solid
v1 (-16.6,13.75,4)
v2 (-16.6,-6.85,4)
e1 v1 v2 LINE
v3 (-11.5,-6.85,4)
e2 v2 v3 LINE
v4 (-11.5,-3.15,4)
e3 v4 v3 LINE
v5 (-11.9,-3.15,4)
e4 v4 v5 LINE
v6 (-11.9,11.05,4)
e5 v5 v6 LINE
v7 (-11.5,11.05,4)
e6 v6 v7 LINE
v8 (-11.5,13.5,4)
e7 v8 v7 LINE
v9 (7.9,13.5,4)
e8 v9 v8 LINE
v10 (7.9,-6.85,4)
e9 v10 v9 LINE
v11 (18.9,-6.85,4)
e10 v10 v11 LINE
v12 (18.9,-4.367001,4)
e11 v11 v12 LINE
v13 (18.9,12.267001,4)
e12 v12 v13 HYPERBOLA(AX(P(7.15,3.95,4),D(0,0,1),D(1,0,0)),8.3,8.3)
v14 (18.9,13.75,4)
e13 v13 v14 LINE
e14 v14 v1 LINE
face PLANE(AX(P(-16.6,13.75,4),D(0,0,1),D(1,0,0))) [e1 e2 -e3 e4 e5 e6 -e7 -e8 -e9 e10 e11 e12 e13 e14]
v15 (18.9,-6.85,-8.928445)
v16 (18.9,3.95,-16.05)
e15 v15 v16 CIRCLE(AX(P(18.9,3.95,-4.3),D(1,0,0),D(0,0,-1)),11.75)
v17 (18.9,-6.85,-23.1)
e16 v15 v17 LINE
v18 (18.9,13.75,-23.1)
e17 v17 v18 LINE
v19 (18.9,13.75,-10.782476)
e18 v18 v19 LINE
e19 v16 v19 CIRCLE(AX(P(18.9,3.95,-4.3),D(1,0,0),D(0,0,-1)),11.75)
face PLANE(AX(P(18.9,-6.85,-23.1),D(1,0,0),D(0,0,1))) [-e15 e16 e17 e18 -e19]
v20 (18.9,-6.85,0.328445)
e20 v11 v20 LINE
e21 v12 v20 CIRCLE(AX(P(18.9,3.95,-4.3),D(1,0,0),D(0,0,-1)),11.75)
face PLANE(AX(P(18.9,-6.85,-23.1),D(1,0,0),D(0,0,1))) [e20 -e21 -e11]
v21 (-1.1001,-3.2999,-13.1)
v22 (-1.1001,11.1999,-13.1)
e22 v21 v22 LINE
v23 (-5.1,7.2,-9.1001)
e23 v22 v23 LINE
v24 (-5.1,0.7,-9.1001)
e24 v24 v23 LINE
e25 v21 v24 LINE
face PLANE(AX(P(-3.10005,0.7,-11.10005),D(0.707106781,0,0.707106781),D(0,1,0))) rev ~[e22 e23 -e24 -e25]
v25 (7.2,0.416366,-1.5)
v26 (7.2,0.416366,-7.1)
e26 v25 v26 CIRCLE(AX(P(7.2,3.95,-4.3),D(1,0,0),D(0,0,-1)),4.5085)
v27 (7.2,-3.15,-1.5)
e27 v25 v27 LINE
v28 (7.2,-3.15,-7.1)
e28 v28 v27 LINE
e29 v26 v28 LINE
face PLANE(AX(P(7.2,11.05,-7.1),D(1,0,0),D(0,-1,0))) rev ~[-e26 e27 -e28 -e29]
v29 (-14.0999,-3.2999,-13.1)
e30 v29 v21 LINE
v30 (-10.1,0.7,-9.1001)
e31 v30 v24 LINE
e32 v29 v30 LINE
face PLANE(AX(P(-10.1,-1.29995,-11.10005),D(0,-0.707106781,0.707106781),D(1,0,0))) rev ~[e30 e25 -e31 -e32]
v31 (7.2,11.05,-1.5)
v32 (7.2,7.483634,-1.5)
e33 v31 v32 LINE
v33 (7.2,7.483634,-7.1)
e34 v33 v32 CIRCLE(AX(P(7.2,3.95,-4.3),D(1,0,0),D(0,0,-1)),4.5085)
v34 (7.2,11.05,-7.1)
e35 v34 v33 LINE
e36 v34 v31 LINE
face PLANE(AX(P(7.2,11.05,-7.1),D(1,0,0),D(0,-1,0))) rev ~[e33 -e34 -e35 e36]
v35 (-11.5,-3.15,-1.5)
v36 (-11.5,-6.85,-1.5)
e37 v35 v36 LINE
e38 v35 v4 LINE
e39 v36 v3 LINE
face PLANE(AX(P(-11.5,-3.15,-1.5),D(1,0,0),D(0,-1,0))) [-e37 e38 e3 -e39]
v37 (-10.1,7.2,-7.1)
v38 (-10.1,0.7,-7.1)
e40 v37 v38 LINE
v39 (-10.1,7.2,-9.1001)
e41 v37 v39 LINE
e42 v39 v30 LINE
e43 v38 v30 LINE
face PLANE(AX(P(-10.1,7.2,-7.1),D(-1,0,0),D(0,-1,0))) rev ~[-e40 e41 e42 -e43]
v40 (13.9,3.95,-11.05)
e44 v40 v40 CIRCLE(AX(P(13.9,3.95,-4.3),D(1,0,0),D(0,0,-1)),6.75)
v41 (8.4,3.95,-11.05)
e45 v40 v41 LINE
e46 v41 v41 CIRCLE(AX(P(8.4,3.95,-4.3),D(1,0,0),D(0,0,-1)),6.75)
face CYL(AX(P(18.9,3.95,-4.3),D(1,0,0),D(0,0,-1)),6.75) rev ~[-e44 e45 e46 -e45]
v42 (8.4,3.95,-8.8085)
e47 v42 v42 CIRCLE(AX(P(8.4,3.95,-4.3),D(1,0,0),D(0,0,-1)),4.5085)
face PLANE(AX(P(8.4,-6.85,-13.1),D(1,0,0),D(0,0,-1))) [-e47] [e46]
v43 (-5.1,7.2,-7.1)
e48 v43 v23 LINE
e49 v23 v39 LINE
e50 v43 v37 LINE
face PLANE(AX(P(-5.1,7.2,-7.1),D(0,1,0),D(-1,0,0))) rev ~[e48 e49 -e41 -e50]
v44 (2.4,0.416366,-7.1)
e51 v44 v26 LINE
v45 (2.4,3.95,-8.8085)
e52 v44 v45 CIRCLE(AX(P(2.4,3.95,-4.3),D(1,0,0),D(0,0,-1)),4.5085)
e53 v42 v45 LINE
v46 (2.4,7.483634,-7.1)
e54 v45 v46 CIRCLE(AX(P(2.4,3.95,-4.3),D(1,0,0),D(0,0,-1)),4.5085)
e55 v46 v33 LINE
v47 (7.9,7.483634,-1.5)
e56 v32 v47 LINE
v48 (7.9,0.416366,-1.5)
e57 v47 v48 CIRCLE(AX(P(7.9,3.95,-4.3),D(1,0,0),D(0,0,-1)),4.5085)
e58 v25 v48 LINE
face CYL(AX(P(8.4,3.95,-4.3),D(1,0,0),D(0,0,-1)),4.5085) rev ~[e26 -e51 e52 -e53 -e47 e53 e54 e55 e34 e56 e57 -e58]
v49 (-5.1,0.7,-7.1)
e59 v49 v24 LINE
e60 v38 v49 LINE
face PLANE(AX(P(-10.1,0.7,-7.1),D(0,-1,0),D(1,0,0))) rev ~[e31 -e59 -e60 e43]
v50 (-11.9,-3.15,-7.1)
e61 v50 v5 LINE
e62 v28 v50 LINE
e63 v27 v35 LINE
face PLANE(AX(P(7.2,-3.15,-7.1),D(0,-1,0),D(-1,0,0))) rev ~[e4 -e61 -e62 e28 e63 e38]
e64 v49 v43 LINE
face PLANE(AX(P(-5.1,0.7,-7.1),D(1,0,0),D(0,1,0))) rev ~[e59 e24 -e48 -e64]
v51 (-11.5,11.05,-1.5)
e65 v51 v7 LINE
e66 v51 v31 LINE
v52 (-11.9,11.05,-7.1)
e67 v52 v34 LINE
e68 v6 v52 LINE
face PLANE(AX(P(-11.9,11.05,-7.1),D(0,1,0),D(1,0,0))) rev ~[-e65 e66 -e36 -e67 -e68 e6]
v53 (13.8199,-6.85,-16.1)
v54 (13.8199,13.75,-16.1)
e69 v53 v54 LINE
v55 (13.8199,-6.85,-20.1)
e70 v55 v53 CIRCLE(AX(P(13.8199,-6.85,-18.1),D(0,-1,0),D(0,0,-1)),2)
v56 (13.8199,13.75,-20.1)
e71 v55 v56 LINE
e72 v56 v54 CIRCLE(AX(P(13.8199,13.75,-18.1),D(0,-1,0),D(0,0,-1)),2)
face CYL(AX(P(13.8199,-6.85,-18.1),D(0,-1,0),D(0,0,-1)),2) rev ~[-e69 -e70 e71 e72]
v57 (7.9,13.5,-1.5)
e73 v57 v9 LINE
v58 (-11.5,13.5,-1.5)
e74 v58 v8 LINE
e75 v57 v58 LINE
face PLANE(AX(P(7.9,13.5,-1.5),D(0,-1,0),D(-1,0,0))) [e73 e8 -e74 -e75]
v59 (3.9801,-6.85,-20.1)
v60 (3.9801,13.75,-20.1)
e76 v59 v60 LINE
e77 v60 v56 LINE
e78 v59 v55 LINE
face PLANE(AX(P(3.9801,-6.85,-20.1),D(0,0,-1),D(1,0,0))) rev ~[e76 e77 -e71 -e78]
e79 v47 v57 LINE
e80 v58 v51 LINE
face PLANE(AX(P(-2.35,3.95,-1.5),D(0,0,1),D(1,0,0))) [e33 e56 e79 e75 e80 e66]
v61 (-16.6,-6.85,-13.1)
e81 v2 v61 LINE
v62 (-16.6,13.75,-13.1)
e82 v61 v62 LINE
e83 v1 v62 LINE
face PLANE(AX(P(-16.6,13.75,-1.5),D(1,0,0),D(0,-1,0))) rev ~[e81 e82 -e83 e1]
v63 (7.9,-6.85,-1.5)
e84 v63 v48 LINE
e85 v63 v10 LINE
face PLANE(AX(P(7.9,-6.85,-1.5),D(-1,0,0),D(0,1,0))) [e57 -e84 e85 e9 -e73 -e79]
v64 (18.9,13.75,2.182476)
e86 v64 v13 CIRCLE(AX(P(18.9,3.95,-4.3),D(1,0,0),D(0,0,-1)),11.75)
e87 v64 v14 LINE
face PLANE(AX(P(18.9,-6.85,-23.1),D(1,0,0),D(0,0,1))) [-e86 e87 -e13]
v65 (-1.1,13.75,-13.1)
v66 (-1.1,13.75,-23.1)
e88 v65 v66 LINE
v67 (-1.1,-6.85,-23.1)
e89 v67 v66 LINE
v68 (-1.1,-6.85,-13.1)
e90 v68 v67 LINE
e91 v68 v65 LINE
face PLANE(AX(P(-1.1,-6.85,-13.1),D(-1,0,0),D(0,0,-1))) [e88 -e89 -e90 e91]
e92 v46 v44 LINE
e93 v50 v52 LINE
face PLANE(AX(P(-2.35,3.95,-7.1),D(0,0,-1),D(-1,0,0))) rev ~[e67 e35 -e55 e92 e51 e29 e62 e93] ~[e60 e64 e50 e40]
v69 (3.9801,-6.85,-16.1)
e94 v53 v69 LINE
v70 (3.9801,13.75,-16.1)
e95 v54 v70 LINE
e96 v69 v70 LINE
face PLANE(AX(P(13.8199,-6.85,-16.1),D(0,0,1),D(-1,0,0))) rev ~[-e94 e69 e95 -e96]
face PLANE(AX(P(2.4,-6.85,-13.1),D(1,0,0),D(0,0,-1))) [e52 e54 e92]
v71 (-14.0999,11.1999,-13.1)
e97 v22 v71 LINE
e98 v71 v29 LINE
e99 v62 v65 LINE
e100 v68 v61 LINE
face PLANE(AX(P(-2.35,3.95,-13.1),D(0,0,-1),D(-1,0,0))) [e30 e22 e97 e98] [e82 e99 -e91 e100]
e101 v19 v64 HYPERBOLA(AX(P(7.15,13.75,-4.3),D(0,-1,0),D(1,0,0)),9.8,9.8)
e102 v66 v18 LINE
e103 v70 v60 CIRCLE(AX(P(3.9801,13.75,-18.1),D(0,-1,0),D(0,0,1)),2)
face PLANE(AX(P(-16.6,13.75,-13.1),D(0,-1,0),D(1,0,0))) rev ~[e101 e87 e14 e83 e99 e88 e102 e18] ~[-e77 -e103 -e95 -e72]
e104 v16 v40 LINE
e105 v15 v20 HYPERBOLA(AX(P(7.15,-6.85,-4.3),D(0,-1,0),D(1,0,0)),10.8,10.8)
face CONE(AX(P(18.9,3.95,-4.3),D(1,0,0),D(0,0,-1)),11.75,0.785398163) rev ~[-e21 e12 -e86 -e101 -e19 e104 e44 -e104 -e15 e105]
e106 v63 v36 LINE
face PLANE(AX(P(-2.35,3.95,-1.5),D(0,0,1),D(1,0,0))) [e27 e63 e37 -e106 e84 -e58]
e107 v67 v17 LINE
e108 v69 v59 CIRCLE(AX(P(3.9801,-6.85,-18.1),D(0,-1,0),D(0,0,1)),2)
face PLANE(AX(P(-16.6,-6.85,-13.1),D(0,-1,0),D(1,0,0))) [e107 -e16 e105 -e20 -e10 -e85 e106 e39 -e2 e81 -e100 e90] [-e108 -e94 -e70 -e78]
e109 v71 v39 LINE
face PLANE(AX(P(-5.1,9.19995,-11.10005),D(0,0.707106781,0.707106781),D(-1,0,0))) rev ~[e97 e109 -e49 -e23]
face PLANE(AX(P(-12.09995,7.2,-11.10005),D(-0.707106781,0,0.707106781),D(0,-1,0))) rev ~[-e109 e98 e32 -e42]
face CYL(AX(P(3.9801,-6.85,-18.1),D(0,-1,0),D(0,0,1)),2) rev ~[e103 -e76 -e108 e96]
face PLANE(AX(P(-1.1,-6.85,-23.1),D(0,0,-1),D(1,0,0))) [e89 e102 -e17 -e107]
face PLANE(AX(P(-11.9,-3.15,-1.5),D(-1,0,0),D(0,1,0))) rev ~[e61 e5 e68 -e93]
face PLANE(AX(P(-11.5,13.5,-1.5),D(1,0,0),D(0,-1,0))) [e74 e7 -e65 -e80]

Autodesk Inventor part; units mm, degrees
ref_plane "YZ Plane" through (0, 0, 0) normal (1, 0, 0) x (0, 1, 0)
ref_plane "XZ Plane" through (0, 0, 0) normal (0, 1, 0) x (-1, 0, 0)
ref_plane "Arbeitsebene1" through (0, 0, 0) normal (0, 0, 1) x (1, 0, 0)
ref_plane "Arbeitsebene2" through (-2.35, 3.95, -7.1) normal (0, 0, -1) x (-1, 0, 0)
sketch "Skizze1" plane through (-2.35, 3.95, -7.1) normal (0, 0, -1) x (-1, 0, 0)
  line L0 (7.75, 3.25) -> (7.75, -3.25) projected
  line L1 (7.75, -3.25) -> (2.75, -3.25) projected
  line L2 (2.75, -3.25) -> (2.75, 3.25) projected
  line L3 (2.75, 3.25) -> (7.75, 3.25) projected
  line L4 (9.25, -6.8) -> (9.25, 6.8) projected
  line L5 (9.25, 6.8) -> (-9.25, 6.8) projected
  line L6 (-9.25, 6.8) -> (-9.25, -6.8) projected
  line L7 (-9.25, -6.8) -> (9.25, -6.8) projected
  line L8 (14.25, 9.8) -> (-21.25, 9.8)
  line L9 (-21.25, 9.8) -> (-21.25, -10.8)
  line L10 (-21.25, -10.8) -> (14.25, -10.8)
  line L11 (14.25, -10.8) -> (14.25, 9.8)
  point P0 (-2.35, -3.95)
  dimension "d0" = 5
  dimension "d1" = 3
  dimension "d2" = 4
  dimension "d3" = 12
extrude "Extrusion1" add sketch "Skizze1" along normal blind 6 contours L7 L6 L5 L4 | L11 L10 L9 L8
sketch "Skizze2" plane through (-2.35, 3.95, -7.1) normal (0, 0, 1) x (1, 0, 0)
  line L0 (-9.25, -6.8) -> (-9.25, 6.8) projected
  line L1 (9.25, -6.8) -> (-9.25, -6.8) projected
  line L2 (9.25, 6.8) -> (9.25, -6.8) projected
  line L3 (-9.25, 6.8) -> (9.25, 6.8) projected
  line L4 (9.55, 7.1) -> (9.55, -7.1)
  line L5 (9.55, -7.1) -> (-9.55, -7.1)
  line L6 (-9.55, -7.1) -> (-9.55, 7.1)
  line L7 (-9.55, 7.1) -> (9.55, 7.1)
  line L8 (21.25, 9.8) -> (21.25, -10.8) projected
  line L9 (-14.25, 9.8) -> (21.25, 9.8) projected
  line L10 (-14.25, -10.8) -> (-14.25, 9.8) projected
  line L11 (21.25, -10.8) -> (-14.25, -10.8) projected
  line L12 (-7.75, 3.25) -> (-7.75, -3.25) projected
  line L13 (-2.75, 3.25) -> (-7.75, 3.25) projected
  line L14 (-2.75, -3.25) -> (-2.75, 3.25) projected
  line L15 (-7.75, -3.25) -> (-2.75, -3.25) projected
  point P0 (2.35, -3.95)
  dimension "d6" = 0.3
ref_plane "Arbeitsebene3" through (-10.5, -12.5, -1.5) normal (0, 0, -1) x (0, 1, 0)
extrude "Extrusion2" add sketch "Skizze2" along normal up to surface (5.6 mm away) contours L8 L11 L10 L9
sketch "Skizze3" plane through (-16.6, 13.75, -1.5) normal (0, 0, 1) x (1, 0, 0)
  line L0 (23.5, -26.25) -> (23.5, -1.25) projected
  line L1 (23.5, -1.25) -> (6.1, -1.25) projected
  line L2 (6.1, -1.25) -> (6.1, -26.25) projected
  line L3 (6.1, -26.25) -> (23.5, -26.25) projected
  line L4 (24.5, -27.25) -> (24.5, -0.25)
  line L5 (24.5, -0.25) -> (5.1, -0.25)
  line L6 (5.1, -0.25) -> (5.1, -27.25)
  line L7 (5.1, -27.25) -> (24.5, -27.25)
  line L8 (4.7, -2.7) -> (23.8, -2.7) projected
  line L9 (23.8, -2.7) -> (23.8, -16.9) projected
  line L10 (23.8, -16.9) -> (4.7, -16.9) projected
  line L11 (4.7, -16.9) -> (4.7, -2.7) projected
  line L12 (35.5, 0) -> (0, 0) projected
  line L13 (0, 0) -> (0, -20.6) projected
  line L14 (0, -20.6) -> (35.5, -20.6) projected
  line L15 (35.5, -20.6) -> (35.5, 0) projected
  point P0 (16.6, -13.75)
  point P1 (24.5, -20.6)
  point P2 (5.1, -20.6)
  point P3 (5.1, -16.9)
  point P4 (5.1, -2.7)
  dimension "d9" = 1
extrude "Extrusion3" add sketch "Skizze3" along normal blind 5.5 contours L4 L5 L6 L8 L11 L10 L14 L13 L12 L15
sketch "Skizze4" plane through (18.9, -6.85, -13.1) normal (1, 0, 0) x (0, 0, -1)
  circle A0 centre (-8.8, 10.8) radius 6.75
  circle A1 centre (-8.8, 10.8) radius 6.5405 projected
  point P0 (-13.1, 6.85)
  dimension "d30" = 13.5
extrude "Extrusion4" cut sketch "Skizze4" against normal blind 10.5 contours A0 | A1
sketch "Skizze5" plane through (8.4, -6.85, -13.1) normal (1, 0, 0) x (0, 0, -1)
  circle A0 centre (-8.8, 10.8) radius 4.5085 projected
  point P0 (-13.1, 6.85)
extrude "Extrusion5" cut sketch "Skizze5" against normal blind 6
sketch "Skizze6" plane through (-16.6, -6.85, -13.1) normal (0, -1, 0) x (1, 0, 0)
  line L0 (0, 17.1) -> (0, 0) projected
  line L1 (35.5, 0) -> (0, 0) projected
  line L2 (35.5, 17.1) -> (35.5, 0) projected
  line L3 (24.5, 17.1) -> (35.5, 17.1) projected
  line L4 (24.5, 11.6) -> (24.5, 17.1) projected
  line L5 (5.1, 11.6) -> (24.5, 11.6) projected
  line L6 (5.1, 11.6) -> (5.1, 17.1) projected
  line L7 (0, 17.1) -> (5.1, 17.1) projected
  line L8 (11.5, 6) -> (11.5, 0) projected
  line L9 (35.5, 0) -> (15.5, 0)
  line L10 (15.5, 0) -> (15.5, -10)
  line L11 (15.5, -10) -> (35.5, -10)
  line L12 (35.5, -10) -> (35.5, 0)
  line L13 (30.4199, -5) -> (20.5801, -5) construction
  line L14 (30.4199, -3) -> (20.5801, -3)
  line L15 (20.5801, -7) -> (30.4199, -7)
  arc A0 (30.4199, -7) -> (30.4199, -3) centre (30.4199, -5) ccw
  arc A1 (20.5801, -3) -> (20.5801, -7) centre (20.5801, -5) ccw
  point P0 (16.6, 13.1)
  point P1 (25.5, -5)
  dimension "d19" = 20
  dimension "d20" = 10
  dimension "d21" = 4
extrude "Extrusion6" add sketch "Skizze6" against normal up to surface (20.6 mm away) contours L1 L12 L11 L10
chamfer "Fase1" distance 5 angle 45 1 edges at (18.9, 3.95, 2.45)
chamfer "Fase2" distance 4 angle 45 4 edges at (-7.6, 0.7, -13.1) (-10.1, 3.95, -13.1) (-7.6, 7.2, -13.1) (-5.1, 3.95, -13.1)
properties part number "30_Scanlens_Laseradaper_v0"
